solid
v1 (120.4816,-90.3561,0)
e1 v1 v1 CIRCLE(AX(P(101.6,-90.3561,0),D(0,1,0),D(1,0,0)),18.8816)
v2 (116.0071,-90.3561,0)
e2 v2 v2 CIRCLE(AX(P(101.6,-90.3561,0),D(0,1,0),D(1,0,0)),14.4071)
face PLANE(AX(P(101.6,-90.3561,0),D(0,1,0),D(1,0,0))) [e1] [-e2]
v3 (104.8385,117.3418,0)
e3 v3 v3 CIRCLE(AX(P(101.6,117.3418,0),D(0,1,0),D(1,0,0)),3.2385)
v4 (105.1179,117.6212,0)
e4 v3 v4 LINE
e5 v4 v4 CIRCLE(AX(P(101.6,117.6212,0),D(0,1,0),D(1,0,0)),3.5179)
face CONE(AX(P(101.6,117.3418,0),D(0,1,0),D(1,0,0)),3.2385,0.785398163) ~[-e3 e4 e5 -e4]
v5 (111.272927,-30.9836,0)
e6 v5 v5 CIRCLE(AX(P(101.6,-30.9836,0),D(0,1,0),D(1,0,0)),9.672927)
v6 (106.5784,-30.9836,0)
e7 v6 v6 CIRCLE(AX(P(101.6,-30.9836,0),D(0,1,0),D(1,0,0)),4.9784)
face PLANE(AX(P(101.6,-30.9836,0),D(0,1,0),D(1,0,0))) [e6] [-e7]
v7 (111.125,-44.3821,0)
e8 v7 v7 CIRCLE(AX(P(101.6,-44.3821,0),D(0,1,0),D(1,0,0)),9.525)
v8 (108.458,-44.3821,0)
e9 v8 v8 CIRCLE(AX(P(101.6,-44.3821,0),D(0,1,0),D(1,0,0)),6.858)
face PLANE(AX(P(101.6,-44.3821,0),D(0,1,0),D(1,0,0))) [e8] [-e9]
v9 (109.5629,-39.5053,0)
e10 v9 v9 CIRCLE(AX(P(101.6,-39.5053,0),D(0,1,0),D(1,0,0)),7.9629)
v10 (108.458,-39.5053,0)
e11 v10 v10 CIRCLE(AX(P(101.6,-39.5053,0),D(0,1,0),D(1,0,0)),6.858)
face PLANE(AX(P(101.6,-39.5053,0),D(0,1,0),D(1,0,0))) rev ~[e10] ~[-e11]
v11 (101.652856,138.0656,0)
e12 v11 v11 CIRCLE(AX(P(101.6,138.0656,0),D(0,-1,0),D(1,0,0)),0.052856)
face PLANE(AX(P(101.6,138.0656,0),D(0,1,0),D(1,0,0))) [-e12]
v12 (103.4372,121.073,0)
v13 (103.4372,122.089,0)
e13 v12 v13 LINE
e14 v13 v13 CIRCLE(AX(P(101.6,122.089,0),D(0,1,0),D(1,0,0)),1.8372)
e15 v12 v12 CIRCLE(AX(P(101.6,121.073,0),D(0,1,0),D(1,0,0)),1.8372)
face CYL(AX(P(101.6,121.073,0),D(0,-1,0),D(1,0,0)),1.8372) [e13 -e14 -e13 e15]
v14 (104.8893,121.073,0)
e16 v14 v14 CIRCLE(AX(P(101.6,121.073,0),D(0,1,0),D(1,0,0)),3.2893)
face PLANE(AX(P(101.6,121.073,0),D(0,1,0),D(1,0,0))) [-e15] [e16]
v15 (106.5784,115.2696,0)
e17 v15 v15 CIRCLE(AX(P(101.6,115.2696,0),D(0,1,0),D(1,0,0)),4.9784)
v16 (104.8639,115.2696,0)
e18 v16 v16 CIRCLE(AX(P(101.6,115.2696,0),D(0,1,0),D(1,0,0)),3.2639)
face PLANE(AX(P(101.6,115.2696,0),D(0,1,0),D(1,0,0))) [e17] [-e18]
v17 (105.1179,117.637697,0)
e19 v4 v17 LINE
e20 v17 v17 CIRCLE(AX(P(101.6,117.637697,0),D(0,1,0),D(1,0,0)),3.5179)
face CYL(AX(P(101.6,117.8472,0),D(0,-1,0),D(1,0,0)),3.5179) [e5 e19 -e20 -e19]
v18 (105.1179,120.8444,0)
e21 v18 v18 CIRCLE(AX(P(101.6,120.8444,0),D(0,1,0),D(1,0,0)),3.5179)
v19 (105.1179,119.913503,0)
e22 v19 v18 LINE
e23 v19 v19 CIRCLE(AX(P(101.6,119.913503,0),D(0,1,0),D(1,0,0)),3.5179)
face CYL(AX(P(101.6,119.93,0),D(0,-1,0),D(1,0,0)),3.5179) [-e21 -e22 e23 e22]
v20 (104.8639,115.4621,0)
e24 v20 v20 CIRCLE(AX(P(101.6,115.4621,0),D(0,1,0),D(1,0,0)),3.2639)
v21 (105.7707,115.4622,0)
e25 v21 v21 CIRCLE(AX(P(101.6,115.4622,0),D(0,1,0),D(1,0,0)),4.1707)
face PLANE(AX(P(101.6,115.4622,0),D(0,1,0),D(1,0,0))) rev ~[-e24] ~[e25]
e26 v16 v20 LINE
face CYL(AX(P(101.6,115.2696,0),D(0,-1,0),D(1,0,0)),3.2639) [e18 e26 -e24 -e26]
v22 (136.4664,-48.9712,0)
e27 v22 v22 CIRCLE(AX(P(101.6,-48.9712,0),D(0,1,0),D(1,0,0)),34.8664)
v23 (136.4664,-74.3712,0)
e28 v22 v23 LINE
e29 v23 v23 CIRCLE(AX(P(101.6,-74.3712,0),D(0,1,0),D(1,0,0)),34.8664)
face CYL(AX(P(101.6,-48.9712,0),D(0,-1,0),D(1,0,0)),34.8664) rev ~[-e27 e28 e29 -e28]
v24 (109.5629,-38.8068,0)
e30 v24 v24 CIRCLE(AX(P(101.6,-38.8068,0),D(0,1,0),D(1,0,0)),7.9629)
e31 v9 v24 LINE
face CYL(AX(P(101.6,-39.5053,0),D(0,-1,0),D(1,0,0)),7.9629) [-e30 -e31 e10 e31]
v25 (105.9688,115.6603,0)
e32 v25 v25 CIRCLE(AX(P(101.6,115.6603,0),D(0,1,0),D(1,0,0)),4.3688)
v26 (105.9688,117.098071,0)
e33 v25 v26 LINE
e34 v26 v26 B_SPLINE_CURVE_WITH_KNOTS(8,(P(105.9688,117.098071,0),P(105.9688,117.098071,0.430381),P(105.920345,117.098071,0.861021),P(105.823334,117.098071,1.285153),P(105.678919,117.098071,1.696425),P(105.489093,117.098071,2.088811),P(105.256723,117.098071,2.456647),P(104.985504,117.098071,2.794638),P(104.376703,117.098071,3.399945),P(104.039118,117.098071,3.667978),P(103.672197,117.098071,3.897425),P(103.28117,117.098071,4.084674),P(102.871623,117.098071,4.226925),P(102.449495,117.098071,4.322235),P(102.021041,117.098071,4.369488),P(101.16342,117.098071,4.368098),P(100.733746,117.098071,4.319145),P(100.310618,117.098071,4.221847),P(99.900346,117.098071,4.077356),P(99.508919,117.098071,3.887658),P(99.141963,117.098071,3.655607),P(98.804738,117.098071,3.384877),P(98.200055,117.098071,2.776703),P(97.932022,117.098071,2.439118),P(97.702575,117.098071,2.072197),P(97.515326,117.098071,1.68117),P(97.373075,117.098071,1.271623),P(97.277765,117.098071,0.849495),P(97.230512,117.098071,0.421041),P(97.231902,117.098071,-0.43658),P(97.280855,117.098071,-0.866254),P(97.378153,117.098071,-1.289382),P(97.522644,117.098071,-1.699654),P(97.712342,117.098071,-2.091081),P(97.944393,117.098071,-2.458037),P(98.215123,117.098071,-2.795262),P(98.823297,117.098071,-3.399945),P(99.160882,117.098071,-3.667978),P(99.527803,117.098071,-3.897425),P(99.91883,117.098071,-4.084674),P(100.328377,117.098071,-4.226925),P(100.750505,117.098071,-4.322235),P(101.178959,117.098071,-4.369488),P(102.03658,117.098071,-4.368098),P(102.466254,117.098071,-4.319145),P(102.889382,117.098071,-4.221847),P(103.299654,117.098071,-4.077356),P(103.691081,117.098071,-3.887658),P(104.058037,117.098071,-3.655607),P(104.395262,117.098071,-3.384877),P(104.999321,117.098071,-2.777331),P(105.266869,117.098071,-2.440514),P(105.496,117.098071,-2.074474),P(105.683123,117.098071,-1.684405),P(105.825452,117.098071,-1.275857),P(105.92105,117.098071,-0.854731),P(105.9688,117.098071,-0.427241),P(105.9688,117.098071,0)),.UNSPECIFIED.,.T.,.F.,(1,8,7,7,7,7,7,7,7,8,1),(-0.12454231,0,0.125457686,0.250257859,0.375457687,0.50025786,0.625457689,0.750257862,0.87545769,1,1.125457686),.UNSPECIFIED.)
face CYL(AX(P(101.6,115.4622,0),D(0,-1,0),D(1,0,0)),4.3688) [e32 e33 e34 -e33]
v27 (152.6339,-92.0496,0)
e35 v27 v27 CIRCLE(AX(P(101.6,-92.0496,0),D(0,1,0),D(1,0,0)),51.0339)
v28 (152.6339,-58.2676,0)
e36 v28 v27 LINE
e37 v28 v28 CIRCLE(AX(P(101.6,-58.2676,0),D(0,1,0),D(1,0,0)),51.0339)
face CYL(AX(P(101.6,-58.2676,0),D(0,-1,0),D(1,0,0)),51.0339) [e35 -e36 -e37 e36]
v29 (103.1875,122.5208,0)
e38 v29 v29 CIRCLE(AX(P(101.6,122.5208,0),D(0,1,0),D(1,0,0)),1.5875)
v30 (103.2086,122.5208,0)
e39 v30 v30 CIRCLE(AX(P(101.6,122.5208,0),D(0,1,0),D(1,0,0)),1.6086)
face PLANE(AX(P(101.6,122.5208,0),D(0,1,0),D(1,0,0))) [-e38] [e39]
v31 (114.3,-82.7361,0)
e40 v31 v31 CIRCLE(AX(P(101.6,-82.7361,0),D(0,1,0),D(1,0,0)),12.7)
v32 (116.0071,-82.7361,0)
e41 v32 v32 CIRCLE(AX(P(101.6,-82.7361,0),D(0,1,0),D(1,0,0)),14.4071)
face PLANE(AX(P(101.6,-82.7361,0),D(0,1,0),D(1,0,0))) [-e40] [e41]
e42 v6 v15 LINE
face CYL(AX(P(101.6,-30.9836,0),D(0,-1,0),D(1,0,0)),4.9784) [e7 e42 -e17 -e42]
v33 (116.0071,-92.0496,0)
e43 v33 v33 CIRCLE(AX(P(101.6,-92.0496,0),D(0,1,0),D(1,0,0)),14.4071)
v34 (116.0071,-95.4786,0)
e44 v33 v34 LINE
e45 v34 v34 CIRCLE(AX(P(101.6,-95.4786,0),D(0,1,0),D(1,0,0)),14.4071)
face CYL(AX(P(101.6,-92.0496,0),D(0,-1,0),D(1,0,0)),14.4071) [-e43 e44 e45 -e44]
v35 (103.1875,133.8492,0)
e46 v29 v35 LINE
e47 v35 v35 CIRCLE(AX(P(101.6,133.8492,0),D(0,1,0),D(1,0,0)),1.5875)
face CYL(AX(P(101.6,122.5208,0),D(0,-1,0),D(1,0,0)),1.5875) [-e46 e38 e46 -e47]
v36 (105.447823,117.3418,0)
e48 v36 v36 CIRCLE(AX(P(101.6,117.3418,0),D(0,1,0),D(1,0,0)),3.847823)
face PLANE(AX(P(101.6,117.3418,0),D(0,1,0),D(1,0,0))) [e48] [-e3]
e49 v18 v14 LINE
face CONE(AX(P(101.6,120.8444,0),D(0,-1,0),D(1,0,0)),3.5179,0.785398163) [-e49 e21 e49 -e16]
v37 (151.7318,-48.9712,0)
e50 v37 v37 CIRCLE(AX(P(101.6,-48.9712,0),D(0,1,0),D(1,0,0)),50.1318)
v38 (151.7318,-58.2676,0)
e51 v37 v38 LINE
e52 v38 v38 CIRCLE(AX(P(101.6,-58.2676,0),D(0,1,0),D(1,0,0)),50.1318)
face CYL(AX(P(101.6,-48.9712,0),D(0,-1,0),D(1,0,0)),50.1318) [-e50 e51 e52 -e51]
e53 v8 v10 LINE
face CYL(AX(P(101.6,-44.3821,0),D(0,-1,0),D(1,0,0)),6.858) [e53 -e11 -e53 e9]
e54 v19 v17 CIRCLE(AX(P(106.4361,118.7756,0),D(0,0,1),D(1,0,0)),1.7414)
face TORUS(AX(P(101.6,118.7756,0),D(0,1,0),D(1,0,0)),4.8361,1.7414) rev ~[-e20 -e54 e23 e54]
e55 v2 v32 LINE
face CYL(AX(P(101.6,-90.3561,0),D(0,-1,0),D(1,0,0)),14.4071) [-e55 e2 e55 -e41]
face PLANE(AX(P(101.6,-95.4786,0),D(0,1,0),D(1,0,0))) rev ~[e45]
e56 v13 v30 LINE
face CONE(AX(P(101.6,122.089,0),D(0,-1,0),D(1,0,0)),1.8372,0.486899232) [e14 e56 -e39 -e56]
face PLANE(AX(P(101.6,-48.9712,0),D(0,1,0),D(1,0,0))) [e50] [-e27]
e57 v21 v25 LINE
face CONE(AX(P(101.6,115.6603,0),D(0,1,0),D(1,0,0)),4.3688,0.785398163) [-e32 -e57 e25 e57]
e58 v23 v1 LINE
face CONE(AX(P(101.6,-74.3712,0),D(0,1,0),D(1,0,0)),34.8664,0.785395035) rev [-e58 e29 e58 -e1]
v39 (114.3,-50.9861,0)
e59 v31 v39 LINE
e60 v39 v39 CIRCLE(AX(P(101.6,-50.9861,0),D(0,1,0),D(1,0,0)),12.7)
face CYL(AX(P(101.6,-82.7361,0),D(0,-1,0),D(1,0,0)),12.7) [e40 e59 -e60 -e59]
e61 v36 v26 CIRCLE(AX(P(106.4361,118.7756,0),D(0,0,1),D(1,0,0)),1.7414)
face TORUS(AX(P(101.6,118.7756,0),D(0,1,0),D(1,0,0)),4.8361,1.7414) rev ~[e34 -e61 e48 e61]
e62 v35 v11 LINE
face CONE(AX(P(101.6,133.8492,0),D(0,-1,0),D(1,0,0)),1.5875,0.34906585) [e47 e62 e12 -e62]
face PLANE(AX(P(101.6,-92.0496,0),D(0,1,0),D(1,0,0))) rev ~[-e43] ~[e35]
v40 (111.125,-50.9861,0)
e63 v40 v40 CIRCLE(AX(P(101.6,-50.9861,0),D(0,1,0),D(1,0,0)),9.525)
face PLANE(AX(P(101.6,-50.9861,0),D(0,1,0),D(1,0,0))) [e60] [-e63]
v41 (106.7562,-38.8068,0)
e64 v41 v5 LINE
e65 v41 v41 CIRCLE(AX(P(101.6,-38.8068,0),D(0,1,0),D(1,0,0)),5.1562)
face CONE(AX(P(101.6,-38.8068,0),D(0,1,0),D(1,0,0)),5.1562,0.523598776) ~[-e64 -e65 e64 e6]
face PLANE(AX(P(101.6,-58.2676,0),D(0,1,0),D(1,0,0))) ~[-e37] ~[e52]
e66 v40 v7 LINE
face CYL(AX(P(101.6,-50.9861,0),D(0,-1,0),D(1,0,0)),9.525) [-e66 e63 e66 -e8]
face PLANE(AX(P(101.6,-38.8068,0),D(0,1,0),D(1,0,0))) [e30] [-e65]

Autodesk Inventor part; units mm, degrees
ref_plane "YZ Plane" through (0, 0, 0) normal (1, 0, 0) x (0, 1, 0)
sketch "Sketch1" plane through (0, 0, 0) normal (0, 0, 1) x (1, 0, 0)
  line L0 (152.6339, -58.2676) -> (152.6339, -92.0496) projected
  line L1 (151.7318, -58.2676) -> (152.6339, -58.2676) projected
  line L2 (151.7318, -48.9712) -> (151.7318, -58.2676) projected
  line L3 (136.4664, -48.9712) -> (136.4664, -74.3712) projected
  line L4 (136.4664, -74.3712) -> (120.4816, -90.3561) projected
  line L5 (120.4816, -90.3561) -> (101.6, -90.3561) projected
  line L6 (101.6, -95.4786) -> (101.6, -90.3561) projected
  line L7 (116.0071, -95.4786) -> (101.6, -95.4786) projected
  line L8 (116.0071, -92.0496) -> (116.0071, -95.4786) projected
  line L9 (152.6339, -92.0496) -> (116.0071, -92.0496) projected
  line L10 (151.7318, -48.9712) -> (136.4664, -48.9712)
revolve "Revolution1" add sketch "Sketch1" angle 360 about axis through (101.6, -95.4786, 0) along (0, 1, 0)
sketch "Sketch2" plane through (101.6, -90.3561, 0) normal (0, 1, 0) x (1, 0, 0)
  circle A0 centre (0, 0) radius 14.4071 projected
extrude "Extrusion1" add sketch "Sketch2" along normal blind 7.62
sketch "Sketch3" plane through (101.6, -82.7361, 0) normal (0, 1, 0) x (1, 0, 0)
  circle A0 centre (0, 0) radius 14.4071 projected
  circle A1 centre (0, 0) radius 12.7
  dimension "d3" = 25.4
extrude "Extrusion2" add sketch "Sketch3" along normal blind 31.75 contours A1
sketch "Sketch4" plane through (101.6, -50.9861, 0) normal (0, 1, 0) x (1, 0, 0)
  circle A0 centre (0, 0) radius 12.7 projected
  circle A1 centre (0, 0) radius 9.525
  dimension "d6" = 19.05
extrude "Extrusion3" add sketch "Sketch4" along normal blind 6.604 contours A1
sketch "Sketch6" plane through (101.6, -44.3821, 0) normal (0, 1, 0) x (1, 0, 0)
  circle A0 centre (0, 0) radius 9.525 projected
  circle A1 centre (0, 0) radius 6.858
  dimension "d12" = 13.716
extrude "Extrusion5" add sketch "Sketch6" along normal blind 4.8768 contours A1
sketch "Sketch7" plane through (101.6, -39.5053, 0) normal (0, 1, 0) x (1, 0, 0)
  circle A0 centre (0, 0) radius 6.858 projected
  circle A1 centre (0, 0) radius 7.9629
  dimension "d15" = 15.9258
extrude "Extrusion6" add sketch "Sketch7" along normal blind 0.6985 contours A0 | A1
sketch "Sketch8" plane through (101.6, -38.8068, 0) normal (0, 1, 0) x (1, 0, 0)
  circle A0 centre (0, 0) radius 7.9629 projected
  circle A1 centre (0, 0) radius 5.1562
  dimension "d18" = 10.3124
extrude "Extrusion7" add sketch "Sketch8" along normal blind 7.8232 draft 30 contours A1
sketch "Sketch9" plane through (101.6, -30.9836, 0) normal (0, 1, 0) x (1, 0, 0)
  circle A0 centre (0, 0) radius 9.6729 projected
  circle A1 centre (0, 0) radius 4.9784
  dimension "d21" = 9.9568
extrude "Extrusion8" add sketch "Sketch9" along normal blind 146.2532 contours A1
sketch "Sketch10" plane through (101.6, 115.2696, 0) normal (0, 1, 0) x (1, 0, 0)
  circle A0 centre (0, 0) radius 4.9784 projected
  circle A1 centre (0, 0) radius 3.2639
  dimension "d24" = 6.5278
extrude "Extrusion9" add sketch "Sketch10" along normal blind 0.1925 contours A1
sketch "Sketch11" plane through (101.6, 115.4622, 0) normal (0, 1, 0) x (1, 0, 0)
  circle A0 centre (0, 0) radius 3.2639 projected
  circle A1 centre (0, 0) radius 4.3688
  dimension "d27" = 8.7376
extrude "Extrusion10" add sketch "Sketch11" along normal blind 1.8796 contours A0 | A1
chamfer "Chamfer1" distance 0.1981 distance2 0.1981 1 edges at (97.2312, 117.3418, 0) measured on face at (105.9122, 116.7152, 0.7008)
chamfer "Chamfer2" distance 0.1981 distance2 0.1981 1 edges at (97.2312, 115.4622, 0) measured on face at (105.5266, 115.4622, 0.6089)
sketch "Sketch12" plane through (101.6, 117.3418, 0) normal (0, 1, 0) x (1, 0, 0)
  circle A0 centre (0, 0) radius 4.1707 projected
  circle A1 centre (0, 0) radius 3.2385
  dimension "d34" = 6.477
extrude "Extrusion11" add sketch "Sketch12" along normal blind 0.2794 draft 45 contours A1
sketch "Sketch13" plane through (101.6, 117.6212, 0) normal (0, 1, 0) x (1, 0, 0)
  circle A0 centre (0, 0) radius 3.5179 projected
extrude "Extrusion12" add sketch "Sketch13" along normal blind 0.2261
sketch "Sketch14" plane through (101.6, 117.8472, 0) normal (0, 1, 0) x (1, 0, 0)
  circle A0 centre (0, 0) radius 3.5179 projected
extrude "Extrusion13" add sketch "Sketch14" along normal blind 2.0828
ref_plane "Work Plane1" through (101.6, 117.6212, 0) normal (0, 0, -1) x (0, 1, 0)
sketch "Sketch15" plane through (101.6, 117.6212, 0) normal (0, 0, -1) x (0, 1, 0)
  line L0 (0, 3.5179) -> (2.3089, 3.5179) projected
  line L1 (1.1544, 3.5179) -> (1.1544, 4.8361)
  circle A0 centre (1.1544, 4.8361) radius 1.7414
ref_plane "Work Plane2" through (105.1179, 118.7756, 0) normal (0, 1, 0) x (1, 0, 0)
sketch "Sketch16" plane through (105.1179, 118.7756, 0) normal (0, 1, 0) x (1, 0, 0)
  circle A0 centre (-3.5179, 0) radius 3.5179 projected
sweep "Sweep1" cut profiles "Sketch15" path "Sketch16"
sketch "Sketch17" plane through (101.6, 119.93, 0) normal (0, 1, 0) x (1, 0, 0)
  circle A0 centre (0, 0) radius 3.5179 projected
extrude "Extrusion14" add sketch "Sketch17" along normal blind 1.143
chamfer "Chamfer3" distance 0.2286 distance2 0.2286 1 edges at (98.0821, 121.073, 0) measured on face at (105.0723, 120.3, 0.5643)
sketch "Sketch18" plane through (101.6, 121.073, 0) normal (0, 1, 0) x (1, 0, 0)
  circle A0 centre (0, 0) radius 3.2893 projected
  circle A1 centre (0, 0) radius 1.8372
  dimension "d48" = 3.6744
extrude "Extrusion15" add sketch "Sketch18" along normal blind 1.4478 contours A1
chamfer "Chamfer4" distance 0.4318 distance2 0.2286 1 edges at (99.7628, 122.5208, 0) measured on face at (101.0889, 122.0382, -1.7647)
sketch "Sketch19" plane through (101.6, 122.5208, 0) normal (0, 1, 0) x (1, 0, 0)
  circle A0 centre (0, 0) radius 1.6086 projected
  circle A1 centre (0, 0) radius 1.5875
  dimension "d53" = 3.175
extrude "Extrusion16" add sketch "Sketch19" along normal blind 11.3284 contours A1
sketch "Sketch20" plane through (101.6, 133.8492, 0) normal (0, 1, 0) x (1, 0, 0)
  circle A0 centre (0, 0) radius 1.5875 projected
extrude "Extrusion17" add sketch "Sketch20" along normal blind 4.2164 draft -20
properties part number "plunger"
